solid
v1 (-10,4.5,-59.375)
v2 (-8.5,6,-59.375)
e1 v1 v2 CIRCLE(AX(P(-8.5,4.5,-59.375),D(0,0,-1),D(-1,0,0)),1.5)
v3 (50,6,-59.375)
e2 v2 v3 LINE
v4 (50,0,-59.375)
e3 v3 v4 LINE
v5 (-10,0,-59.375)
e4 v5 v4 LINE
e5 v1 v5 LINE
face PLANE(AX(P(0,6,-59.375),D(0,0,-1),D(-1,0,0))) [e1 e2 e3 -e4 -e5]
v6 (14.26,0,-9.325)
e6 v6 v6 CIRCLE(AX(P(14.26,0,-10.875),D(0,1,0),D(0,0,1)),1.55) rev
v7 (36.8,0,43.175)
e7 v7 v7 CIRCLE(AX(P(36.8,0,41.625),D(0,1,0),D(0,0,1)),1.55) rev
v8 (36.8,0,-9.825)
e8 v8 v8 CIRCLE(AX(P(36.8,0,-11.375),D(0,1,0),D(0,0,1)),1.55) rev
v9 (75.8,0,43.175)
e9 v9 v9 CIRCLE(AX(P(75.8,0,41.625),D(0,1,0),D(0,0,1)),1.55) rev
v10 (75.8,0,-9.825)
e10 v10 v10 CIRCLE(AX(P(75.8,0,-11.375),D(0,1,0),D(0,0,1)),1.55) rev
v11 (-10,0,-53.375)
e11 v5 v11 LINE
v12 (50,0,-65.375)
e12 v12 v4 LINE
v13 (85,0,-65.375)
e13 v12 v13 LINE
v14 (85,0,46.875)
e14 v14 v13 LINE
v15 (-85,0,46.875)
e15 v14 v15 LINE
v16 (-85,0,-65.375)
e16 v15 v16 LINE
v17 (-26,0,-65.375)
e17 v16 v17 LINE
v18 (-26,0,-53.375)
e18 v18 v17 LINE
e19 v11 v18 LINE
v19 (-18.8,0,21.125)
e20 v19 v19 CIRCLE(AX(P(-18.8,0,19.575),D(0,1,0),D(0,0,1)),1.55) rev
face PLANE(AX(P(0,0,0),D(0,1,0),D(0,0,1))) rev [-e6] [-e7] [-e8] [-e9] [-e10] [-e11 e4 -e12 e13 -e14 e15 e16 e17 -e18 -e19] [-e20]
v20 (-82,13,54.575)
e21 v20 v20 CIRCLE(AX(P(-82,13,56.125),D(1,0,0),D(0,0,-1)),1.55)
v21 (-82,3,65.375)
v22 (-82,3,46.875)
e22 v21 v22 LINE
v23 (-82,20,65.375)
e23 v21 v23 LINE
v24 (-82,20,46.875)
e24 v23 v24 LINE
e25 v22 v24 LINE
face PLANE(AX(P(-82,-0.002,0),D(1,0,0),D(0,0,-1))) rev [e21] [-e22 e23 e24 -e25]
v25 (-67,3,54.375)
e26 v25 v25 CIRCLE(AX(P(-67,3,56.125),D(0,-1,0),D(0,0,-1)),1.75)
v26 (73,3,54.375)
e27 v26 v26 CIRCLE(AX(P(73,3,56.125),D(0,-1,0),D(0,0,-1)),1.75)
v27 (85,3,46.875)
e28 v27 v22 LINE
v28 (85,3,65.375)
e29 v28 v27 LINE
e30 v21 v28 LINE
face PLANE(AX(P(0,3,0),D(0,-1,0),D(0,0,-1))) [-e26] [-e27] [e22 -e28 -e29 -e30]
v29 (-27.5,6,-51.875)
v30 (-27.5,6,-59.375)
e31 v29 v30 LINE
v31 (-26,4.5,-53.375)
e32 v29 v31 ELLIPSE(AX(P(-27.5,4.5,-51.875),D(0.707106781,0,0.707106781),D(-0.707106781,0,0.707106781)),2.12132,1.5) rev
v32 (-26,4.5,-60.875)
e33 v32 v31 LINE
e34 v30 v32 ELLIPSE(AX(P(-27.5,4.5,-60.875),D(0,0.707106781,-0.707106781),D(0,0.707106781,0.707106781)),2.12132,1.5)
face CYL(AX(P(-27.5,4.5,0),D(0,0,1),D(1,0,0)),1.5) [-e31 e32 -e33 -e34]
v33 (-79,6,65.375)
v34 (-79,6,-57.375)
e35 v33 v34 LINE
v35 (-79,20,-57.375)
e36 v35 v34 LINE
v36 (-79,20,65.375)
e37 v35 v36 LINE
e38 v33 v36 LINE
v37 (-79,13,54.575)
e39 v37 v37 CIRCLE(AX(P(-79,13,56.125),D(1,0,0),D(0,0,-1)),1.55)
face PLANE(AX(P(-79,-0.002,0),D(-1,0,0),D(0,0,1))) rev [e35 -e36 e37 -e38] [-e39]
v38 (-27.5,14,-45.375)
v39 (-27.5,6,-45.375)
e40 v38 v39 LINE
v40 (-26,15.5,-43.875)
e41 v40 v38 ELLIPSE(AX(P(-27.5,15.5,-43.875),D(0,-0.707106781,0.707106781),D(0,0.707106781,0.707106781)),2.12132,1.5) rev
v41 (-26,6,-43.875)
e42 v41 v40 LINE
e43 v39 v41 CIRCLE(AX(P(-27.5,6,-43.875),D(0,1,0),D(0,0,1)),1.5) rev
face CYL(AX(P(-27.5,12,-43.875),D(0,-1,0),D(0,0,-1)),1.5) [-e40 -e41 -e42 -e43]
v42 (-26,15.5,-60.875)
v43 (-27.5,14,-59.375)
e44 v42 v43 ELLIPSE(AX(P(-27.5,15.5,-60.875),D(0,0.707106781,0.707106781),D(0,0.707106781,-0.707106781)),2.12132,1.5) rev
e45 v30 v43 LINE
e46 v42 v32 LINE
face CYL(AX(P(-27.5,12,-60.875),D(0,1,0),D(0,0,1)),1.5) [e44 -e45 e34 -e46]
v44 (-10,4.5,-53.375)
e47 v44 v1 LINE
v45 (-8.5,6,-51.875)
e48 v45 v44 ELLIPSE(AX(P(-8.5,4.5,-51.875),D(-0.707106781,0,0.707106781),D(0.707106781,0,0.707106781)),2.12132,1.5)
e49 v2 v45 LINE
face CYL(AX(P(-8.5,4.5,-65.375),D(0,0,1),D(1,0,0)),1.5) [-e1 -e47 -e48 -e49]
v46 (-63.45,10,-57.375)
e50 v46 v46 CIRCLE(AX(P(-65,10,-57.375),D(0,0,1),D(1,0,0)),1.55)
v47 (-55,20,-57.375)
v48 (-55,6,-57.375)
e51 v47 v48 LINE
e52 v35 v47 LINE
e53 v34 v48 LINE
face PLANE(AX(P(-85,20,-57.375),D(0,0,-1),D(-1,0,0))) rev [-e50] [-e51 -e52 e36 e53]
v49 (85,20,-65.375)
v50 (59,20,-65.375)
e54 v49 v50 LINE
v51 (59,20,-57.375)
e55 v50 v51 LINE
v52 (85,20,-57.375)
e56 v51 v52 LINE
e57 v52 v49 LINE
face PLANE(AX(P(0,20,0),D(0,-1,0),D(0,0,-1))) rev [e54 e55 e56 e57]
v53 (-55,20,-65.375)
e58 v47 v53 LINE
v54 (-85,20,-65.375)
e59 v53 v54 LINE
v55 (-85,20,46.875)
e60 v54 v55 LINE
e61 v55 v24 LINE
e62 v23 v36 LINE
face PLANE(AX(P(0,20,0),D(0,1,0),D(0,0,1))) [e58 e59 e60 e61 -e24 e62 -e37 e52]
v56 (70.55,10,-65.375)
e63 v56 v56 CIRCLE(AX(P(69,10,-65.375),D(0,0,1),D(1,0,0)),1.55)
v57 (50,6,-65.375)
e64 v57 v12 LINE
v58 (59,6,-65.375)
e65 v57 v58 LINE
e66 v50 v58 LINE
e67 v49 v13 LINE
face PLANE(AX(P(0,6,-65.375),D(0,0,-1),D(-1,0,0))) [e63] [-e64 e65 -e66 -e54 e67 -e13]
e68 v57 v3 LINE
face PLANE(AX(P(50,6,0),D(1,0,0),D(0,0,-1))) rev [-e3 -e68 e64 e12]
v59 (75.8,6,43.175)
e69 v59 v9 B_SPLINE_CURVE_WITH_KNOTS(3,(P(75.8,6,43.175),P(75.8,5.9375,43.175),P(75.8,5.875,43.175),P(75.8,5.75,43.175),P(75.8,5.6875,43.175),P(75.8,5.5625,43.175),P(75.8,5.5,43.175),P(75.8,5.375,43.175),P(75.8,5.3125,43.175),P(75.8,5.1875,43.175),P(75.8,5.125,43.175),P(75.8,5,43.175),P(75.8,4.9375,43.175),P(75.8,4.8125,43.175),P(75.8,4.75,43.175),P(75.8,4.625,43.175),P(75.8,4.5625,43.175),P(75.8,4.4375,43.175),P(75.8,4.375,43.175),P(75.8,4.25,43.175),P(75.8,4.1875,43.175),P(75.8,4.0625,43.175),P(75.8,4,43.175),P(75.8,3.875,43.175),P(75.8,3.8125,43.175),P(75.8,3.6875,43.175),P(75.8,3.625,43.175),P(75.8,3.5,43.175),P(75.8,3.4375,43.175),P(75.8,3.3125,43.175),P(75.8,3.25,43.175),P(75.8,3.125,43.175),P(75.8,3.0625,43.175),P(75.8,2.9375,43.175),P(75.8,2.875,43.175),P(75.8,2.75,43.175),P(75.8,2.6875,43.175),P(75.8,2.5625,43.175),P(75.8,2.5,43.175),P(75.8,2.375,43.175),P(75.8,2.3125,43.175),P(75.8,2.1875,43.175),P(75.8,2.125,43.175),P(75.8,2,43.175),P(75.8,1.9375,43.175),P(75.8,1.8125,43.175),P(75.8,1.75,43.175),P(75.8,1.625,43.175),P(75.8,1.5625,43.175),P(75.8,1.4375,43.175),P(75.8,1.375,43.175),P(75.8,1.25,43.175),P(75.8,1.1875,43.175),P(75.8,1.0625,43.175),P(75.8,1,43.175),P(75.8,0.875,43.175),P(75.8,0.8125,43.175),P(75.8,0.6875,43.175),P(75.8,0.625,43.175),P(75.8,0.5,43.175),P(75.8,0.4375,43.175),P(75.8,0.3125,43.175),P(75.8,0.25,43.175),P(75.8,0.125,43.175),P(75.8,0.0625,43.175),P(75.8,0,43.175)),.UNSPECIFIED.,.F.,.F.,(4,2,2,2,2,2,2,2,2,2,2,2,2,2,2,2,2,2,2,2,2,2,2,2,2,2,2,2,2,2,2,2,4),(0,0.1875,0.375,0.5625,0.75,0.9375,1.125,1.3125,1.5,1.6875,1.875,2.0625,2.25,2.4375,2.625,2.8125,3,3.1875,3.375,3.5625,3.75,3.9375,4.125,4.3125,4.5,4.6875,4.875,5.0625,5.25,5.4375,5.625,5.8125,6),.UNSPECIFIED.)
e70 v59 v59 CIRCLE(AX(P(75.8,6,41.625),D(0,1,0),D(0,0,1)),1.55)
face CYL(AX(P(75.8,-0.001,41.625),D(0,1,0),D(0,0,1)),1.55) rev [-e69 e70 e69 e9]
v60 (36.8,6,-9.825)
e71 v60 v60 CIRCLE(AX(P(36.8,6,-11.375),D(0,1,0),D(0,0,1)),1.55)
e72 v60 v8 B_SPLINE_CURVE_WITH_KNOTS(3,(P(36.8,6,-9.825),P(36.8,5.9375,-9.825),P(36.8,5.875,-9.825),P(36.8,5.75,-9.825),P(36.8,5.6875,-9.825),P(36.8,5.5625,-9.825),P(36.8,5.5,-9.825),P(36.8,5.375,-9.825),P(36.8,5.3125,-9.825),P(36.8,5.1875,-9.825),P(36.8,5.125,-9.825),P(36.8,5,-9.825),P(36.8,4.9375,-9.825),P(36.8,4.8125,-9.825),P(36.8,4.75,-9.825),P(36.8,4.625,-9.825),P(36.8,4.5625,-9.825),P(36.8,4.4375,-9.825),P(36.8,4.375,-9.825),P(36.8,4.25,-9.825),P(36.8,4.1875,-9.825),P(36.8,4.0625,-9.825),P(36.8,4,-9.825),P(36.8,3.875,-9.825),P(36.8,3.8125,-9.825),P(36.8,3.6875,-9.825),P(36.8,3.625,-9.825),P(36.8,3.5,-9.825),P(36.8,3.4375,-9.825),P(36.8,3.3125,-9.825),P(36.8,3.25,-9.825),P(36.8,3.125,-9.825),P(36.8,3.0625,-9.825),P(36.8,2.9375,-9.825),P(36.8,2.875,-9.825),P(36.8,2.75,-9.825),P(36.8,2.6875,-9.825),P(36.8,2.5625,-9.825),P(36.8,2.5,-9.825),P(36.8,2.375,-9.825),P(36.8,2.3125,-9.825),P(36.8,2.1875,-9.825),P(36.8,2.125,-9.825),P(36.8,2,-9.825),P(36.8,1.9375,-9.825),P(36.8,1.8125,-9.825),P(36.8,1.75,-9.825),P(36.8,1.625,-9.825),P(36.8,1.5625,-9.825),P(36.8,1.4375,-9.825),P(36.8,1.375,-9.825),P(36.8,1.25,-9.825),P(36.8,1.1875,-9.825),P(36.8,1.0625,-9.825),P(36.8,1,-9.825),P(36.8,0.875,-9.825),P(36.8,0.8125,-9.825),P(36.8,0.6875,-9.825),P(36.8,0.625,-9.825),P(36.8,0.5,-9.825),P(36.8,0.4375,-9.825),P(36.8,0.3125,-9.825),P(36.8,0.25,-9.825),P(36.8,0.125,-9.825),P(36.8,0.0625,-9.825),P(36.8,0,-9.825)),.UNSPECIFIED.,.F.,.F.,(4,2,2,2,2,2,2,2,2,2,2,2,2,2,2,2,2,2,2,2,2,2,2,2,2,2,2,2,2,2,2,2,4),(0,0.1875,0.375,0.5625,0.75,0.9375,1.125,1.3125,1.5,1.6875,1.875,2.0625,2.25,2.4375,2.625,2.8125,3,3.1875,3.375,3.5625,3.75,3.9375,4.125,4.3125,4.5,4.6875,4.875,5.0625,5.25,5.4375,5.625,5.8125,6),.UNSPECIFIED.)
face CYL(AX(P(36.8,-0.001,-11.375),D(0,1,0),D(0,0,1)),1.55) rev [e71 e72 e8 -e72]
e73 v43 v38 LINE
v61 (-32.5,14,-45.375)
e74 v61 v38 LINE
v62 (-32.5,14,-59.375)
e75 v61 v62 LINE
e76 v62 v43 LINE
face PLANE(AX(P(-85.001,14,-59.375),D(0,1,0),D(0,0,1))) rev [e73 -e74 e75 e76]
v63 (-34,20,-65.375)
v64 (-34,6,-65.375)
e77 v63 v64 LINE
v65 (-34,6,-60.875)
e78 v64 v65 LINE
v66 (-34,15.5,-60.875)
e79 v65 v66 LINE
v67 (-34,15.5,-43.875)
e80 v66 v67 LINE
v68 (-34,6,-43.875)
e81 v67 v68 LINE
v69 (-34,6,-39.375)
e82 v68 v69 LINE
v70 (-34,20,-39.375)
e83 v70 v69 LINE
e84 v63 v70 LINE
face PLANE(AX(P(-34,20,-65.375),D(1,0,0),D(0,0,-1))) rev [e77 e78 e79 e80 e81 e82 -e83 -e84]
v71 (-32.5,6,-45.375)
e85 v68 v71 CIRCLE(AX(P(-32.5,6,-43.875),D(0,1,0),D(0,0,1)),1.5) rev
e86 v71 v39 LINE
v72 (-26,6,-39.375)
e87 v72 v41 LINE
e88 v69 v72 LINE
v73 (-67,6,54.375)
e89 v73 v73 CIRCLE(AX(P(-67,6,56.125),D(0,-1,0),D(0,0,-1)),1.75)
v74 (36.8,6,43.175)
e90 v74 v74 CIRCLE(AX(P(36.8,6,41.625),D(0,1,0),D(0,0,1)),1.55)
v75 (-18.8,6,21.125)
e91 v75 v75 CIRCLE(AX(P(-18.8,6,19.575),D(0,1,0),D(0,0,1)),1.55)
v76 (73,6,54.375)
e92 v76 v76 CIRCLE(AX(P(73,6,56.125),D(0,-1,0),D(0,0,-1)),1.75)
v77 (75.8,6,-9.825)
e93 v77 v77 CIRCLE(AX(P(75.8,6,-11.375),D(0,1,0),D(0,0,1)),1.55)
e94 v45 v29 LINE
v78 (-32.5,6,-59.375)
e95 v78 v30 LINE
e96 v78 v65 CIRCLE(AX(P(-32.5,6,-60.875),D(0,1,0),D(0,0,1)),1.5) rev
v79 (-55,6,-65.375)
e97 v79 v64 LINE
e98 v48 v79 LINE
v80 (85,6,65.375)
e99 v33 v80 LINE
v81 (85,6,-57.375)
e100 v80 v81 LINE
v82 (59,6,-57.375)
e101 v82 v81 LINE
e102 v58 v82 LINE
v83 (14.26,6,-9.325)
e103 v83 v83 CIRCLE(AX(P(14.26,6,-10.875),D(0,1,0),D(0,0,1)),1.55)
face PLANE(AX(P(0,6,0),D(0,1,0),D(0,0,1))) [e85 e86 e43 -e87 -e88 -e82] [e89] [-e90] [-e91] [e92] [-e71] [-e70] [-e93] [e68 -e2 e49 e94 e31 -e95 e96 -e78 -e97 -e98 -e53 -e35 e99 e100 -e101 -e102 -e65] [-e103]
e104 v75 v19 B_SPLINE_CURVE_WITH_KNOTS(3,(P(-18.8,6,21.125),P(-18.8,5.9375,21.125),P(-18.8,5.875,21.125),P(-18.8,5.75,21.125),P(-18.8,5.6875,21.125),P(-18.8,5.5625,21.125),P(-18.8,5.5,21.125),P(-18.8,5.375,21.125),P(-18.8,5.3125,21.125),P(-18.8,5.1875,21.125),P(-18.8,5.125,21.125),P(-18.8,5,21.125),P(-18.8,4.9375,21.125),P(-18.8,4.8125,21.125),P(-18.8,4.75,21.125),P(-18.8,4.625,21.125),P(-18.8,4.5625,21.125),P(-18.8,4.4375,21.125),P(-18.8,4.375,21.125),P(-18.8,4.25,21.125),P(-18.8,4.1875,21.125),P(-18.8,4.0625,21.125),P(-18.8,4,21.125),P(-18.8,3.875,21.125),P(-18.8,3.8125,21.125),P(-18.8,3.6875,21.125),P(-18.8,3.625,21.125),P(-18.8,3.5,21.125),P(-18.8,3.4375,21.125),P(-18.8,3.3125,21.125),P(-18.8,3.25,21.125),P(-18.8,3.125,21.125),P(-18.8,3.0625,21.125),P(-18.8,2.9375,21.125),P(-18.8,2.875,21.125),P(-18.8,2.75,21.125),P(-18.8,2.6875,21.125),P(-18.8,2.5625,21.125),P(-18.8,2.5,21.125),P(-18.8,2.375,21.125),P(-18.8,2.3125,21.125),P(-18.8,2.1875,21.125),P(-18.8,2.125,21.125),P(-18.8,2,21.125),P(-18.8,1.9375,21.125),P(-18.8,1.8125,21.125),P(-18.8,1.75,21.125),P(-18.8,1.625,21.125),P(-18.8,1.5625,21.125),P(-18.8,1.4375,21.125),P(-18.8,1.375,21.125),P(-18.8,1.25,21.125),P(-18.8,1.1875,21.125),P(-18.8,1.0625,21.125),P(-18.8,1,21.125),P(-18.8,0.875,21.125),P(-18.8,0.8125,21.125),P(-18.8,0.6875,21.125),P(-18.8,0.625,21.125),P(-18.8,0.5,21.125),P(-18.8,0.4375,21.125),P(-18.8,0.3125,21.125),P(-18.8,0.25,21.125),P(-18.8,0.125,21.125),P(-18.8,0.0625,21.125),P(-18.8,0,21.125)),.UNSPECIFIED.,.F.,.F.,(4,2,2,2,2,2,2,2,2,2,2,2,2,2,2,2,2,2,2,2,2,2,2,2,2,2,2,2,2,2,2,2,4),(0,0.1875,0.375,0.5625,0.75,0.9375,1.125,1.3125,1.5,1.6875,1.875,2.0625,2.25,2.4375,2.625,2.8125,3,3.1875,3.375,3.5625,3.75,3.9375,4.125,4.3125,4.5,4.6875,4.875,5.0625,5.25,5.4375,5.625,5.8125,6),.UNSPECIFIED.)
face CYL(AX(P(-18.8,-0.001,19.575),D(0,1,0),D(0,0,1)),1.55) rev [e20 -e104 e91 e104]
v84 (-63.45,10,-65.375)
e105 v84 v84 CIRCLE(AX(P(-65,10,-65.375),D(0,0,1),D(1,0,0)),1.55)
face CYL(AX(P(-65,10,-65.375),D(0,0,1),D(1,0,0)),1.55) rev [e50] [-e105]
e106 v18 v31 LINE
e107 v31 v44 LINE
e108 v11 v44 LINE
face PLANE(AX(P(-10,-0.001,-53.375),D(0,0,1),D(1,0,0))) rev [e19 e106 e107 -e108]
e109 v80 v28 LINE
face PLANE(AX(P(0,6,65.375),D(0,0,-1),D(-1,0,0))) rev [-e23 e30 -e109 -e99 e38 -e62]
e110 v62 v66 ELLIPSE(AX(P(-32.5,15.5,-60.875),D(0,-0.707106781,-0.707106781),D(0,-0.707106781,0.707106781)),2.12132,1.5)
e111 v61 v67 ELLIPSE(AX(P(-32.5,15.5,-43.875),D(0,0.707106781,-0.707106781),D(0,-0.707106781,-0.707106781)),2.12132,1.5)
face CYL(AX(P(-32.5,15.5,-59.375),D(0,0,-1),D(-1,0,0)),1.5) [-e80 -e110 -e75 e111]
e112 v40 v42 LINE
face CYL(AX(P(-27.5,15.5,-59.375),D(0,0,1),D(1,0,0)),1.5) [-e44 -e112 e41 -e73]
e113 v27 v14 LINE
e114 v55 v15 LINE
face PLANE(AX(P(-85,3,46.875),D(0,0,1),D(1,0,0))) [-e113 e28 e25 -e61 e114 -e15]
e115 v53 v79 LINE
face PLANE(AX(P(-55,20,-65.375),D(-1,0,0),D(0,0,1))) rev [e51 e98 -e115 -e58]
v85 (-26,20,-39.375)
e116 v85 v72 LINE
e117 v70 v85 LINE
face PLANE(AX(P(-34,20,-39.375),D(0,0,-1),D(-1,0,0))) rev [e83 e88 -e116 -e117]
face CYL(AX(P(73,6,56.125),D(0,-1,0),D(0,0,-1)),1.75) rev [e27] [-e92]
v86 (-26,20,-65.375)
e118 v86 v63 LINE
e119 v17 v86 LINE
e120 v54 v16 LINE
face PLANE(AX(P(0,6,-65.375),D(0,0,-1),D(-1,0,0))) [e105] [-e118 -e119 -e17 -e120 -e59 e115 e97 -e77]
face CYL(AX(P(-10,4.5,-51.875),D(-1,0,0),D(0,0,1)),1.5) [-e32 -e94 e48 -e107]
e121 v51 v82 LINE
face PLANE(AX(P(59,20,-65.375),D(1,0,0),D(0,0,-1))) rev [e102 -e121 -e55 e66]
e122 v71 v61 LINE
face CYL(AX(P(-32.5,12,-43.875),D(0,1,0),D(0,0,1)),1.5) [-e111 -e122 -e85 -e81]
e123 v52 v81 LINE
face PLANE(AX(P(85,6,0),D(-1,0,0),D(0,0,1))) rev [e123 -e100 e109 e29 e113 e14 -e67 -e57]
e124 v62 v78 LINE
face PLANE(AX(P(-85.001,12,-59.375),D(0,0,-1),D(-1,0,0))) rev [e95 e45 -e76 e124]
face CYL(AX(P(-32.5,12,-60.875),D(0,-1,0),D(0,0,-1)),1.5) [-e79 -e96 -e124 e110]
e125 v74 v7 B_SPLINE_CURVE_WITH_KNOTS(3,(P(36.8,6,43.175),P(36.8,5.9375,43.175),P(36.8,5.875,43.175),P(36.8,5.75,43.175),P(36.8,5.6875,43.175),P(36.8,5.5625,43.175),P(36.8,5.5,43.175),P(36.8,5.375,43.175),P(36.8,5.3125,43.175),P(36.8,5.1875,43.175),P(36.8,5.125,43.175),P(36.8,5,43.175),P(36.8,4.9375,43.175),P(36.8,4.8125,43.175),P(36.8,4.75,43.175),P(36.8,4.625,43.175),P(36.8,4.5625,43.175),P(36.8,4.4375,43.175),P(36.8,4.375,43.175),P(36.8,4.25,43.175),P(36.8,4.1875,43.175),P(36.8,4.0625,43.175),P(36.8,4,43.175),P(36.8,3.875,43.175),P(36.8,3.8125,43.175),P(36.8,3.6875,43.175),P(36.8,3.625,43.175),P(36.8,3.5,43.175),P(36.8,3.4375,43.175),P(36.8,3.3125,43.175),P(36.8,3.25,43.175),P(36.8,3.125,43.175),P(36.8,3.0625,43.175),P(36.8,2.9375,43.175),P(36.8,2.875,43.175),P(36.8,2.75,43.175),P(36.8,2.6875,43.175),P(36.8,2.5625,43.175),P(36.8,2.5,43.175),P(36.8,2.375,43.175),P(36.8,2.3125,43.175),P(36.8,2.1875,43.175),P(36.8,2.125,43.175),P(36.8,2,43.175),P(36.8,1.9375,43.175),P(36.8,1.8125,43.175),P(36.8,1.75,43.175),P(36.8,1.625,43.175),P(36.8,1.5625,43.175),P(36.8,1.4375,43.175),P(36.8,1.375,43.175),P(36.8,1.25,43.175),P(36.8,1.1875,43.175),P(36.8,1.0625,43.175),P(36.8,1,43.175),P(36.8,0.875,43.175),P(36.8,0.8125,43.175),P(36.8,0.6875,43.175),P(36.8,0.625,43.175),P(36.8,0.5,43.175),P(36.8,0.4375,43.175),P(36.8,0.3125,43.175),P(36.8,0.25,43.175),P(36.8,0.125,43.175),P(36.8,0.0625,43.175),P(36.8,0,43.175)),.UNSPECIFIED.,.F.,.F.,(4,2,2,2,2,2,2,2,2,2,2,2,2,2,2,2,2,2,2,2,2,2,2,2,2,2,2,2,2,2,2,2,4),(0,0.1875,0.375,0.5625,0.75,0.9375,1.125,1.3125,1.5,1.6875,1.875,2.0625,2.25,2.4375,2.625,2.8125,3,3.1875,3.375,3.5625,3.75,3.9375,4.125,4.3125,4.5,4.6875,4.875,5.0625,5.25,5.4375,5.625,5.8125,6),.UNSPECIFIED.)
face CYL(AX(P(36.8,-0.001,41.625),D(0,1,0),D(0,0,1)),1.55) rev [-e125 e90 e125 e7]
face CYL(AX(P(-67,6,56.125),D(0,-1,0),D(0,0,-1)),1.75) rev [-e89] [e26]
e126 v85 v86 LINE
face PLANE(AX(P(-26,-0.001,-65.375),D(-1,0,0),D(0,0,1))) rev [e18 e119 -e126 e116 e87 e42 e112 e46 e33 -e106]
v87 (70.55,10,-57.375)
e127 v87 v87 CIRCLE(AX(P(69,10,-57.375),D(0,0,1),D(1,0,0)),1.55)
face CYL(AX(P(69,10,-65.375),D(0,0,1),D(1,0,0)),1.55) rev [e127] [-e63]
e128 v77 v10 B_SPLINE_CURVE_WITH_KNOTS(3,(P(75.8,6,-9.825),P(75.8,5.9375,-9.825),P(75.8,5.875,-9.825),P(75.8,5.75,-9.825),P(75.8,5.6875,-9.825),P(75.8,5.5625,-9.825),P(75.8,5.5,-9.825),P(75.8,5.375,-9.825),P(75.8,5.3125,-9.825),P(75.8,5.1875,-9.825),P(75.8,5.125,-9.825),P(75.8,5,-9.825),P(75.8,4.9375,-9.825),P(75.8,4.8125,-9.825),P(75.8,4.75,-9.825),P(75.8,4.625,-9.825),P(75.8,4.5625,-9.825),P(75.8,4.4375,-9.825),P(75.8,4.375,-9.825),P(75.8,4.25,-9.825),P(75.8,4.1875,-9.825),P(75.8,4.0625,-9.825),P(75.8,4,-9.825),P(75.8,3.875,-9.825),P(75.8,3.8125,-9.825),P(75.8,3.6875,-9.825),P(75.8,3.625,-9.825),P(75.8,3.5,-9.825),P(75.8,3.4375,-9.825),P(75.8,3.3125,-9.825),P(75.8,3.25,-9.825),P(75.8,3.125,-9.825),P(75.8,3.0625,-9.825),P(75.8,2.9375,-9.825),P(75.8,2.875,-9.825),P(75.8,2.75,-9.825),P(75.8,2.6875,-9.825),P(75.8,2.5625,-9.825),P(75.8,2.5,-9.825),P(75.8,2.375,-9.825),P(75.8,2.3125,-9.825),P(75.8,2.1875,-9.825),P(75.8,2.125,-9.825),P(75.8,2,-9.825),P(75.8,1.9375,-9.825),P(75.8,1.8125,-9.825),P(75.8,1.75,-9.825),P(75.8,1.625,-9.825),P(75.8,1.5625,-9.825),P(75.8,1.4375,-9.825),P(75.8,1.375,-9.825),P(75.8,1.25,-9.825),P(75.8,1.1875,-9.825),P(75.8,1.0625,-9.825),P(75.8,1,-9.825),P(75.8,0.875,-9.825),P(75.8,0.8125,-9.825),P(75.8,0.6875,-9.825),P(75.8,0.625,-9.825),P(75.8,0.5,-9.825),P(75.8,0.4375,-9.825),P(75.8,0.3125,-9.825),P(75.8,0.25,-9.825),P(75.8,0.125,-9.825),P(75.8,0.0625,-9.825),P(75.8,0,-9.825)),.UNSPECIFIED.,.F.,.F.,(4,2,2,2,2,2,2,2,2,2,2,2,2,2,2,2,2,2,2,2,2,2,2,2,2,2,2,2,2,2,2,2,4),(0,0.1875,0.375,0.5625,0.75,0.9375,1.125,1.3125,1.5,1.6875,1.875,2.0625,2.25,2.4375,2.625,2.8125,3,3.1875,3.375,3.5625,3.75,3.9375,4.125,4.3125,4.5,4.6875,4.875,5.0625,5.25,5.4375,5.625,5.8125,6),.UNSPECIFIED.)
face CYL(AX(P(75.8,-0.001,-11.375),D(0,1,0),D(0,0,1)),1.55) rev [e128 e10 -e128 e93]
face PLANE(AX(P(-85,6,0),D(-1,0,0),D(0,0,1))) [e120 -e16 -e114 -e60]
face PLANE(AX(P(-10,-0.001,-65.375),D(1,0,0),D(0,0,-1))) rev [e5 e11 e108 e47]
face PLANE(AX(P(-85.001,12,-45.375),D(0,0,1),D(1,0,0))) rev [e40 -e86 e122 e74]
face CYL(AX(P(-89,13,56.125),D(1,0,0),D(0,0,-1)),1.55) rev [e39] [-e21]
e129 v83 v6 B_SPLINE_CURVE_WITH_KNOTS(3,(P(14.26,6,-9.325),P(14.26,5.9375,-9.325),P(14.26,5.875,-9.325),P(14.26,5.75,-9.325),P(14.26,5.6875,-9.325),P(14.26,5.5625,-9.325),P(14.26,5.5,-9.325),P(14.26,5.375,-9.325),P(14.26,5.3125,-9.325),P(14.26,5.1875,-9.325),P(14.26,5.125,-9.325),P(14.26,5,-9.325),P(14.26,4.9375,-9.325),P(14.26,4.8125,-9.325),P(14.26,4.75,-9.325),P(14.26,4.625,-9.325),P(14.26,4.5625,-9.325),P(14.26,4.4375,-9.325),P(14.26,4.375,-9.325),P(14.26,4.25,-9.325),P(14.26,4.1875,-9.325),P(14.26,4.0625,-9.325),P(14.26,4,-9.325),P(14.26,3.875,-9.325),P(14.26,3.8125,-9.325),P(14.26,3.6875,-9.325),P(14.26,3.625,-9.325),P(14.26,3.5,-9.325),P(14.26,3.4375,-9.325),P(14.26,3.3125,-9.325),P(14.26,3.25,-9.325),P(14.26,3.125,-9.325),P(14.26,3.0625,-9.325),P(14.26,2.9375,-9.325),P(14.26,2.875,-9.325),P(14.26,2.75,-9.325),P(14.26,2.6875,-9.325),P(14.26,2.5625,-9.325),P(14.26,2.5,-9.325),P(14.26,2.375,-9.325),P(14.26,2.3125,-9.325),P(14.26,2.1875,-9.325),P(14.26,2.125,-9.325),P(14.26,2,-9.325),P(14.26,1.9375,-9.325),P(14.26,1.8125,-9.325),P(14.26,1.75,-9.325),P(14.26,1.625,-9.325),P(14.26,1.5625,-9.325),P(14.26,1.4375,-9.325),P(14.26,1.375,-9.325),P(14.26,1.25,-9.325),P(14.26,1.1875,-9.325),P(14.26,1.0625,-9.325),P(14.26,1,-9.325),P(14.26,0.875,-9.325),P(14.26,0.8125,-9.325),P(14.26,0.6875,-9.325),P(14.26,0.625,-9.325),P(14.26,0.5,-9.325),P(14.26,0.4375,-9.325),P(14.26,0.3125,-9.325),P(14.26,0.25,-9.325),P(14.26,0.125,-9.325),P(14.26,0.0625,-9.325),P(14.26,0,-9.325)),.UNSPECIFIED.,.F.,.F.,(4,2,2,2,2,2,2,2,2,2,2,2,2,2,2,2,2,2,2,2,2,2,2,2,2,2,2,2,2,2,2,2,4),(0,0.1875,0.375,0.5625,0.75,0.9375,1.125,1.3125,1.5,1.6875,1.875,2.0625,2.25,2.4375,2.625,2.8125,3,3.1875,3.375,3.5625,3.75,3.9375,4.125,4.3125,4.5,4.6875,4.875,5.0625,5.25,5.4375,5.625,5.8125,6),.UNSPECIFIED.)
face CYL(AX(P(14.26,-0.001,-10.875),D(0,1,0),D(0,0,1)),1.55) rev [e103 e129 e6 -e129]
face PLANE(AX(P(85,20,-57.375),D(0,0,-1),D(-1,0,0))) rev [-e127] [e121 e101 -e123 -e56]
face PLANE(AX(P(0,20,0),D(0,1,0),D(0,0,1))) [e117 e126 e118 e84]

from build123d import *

# Parameters (mm, degrees)
BOSS_EXTRUDE1_DEPTH = 6
SKETCH2_W           = 30
SKETCH2_H           = 8
SKETCH2_W_2         = 26
BOSS_EXTRUDE2_DEPTH = 14
SKETCH3_R           = 1.55
CUT_EXTRUDE1_DEPTH  = 151.6405075
SKETCH4_W           = 170
SKETCH4_H           = 18.5
CUT_EXTRUDE2_DEPTH  = 3
SKETCH5_R           = 1.75
CUT_EXTRUDE3_DEPTH  = 3
BOSS_EXTRUDE3_REACH = 111.082
CUT_EXTRUDE4_REACH  = 110.143
SKETCH8_W           = 3
SKETCH8_H           = 18.5
SKETCH9_R           = 1.55
CUT_EXTRUDE5_DEPTH  = 10
CUT_EXTRUDE6_REACH  = 110.143
SKETCH10_W          = 16
SKETCH10_H          = 12
SKETCH11_W          = 8
SKETCH11_H          = 26
BOSS_EXTRUDE4_DEPTH = 14
CUT_EXTRUDE7_REACH  = 132.364
FILLET1_R           = 1.5
CUT_EXTRUDE8_REACH  = 110.143
SKETCH15_R          = 1.55


with BuildPart() as part:
    # Sketch1 → Boss-Extrude1 (new body)
    with BuildSketch(Plane(origin=(0, 0, 0), x_dir=(1, 0, 0), z_dir=(0, 1, 0))):
        Polygon((-85, 65.375), (-85, -65.375), (85, -65.375), (85, 65.375), (50, 65.375), (50, 59.375), (-10, 59.375), (-10, 65.375), align=None)
    extrude(amount=BOSS_EXTRUDE1_DEPTH)

    # Sketch2 → Boss-Extrude2 (add)
    with BuildSketch(Plane(origin=(0, 6, 0), x_dir=(1, 0, 0), z_dir=(0, 1, 0))):
        with Locations((-70, 61.375)):
            Rectangle(SKETCH2_W, SKETCH2_H)
        with Locations((72, 61.375)):
            Rectangle(SKETCH2_W_2, SKETCH2_H)
    extrude(amount=BOSS_EXTRUDE2_DEPTH)

    # Sketch3 → Cut-Extrude1 (cut, through all)
    with BuildSketch(Plane.XY.offset(-57.375)):
        with Locations((-65, 10)):
            Circle(SKETCH3_R)
        with Locations((69, 10)):
            Circle(SKETCH3_R)
    extrude(amount=-CUT_EXTRUDE1_DEPTH, mode=Mode.SUBTRACT)

    # Sketch4 → Cut-Extrude2 (cut)
    with BuildSketch(Plane(origin=(0, 0, 0), x_dir=(1, 0, 0), z_dir=(0, 1, 0))):
        with Locations((0, -56.125)):
            Rectangle(SKETCH4_W, SKETCH4_H)
    extrude(amount=CUT_EXTRUDE2_DEPTH, mode=Mode.SUBTRACT)

    # Sketch5 → Cut-Extrude3 (cut)
    with BuildSketch(Plane(origin=(0, 3, 0), x_dir=(-1, 0, 0), z_dir=(0, -1, 0))):
        with Locations(Location((67, -56.125, 0), (0, 0, 90))):
            Circle(SKETCH5_R)
        with Locations(Location((-73, -56.125, 0), (0, 0, 90))):
            Circle(SKETCH5_R)
    extrude(amount=-CUT_EXTRUDE3_DEPTH, mode=Mode.SUBTRACT)

    # Sketch7 → Boss-Extrude3 (add, up to next)
    with BuildSketch(Plane(origin=(0, 20, 0), x_dir=(1, 0, 0), z_dir=(0, 1, 0)), mode=Mode.PRIVATE) as boss_extrude3_sk1:
        Polygon((-79, 65.375), (-85, 65.375), (-85, -46.875), (-82, -46.875), (-82, -65.375), (-79, -65.375), align=None)
    boss_extrude3_tool1 = extrude(boss_extrude3_sk1.sketch, amount=-BOSS_EXTRUDE3_REACH, mode=Mode.PRIVATE) - part.part
    add(boss_extrude3_tool1.solids().sort_by_distance((-81.885802, 20, -4.272891))[0])

    # Sketch8 → Cut-Extrude4 (cut, up to next)
    with BuildSketch(Plane(origin=(0, 6, 0), x_dir=(1, 0, 0), z_dir=(0, 1, 0)), mode=Mode.PRIVATE) as cut_extrude4_sk1:
        with Locations((-83.5, -56.125)):
            Rectangle(SKETCH8_W, SKETCH8_H)
    cut_extrude4_tool1 = extrude(cut_extrude4_sk1.sketch, amount=-CUT_EXTRUDE4_REACH, mode=Mode.PRIVATE) & part.part
    add(cut_extrude4_tool1.solids().sort_by_distance((-83.5, 6, 56.125))[0], mode=Mode.SUBTRACT)

    # Sketch9 → Cut-Extrude5 (cut)
    with BuildSketch(Plane(origin=(-79, 0, 0), x_dir=(0, 0, -1), z_dir=(1, 0, 0))):
        with Locations((-56.125, 13)):
            Circle(SKETCH9_R)
    extrude(amount=-CUT_EXTRUDE5_DEPTH, mode=Mode.SUBTRACT)

    # Sketch10 → Cut-Extrude6 (cut, up to next)
    with BuildSketch(Plane(origin=(0, 6, 0), x_dir=(1, 0, 0), z_dir=(0, 1, 0)), mode=Mode.PRIVATE) as cut_extrude6_sk1:
        with Locations((-18, 59.375)):
            Rectangle(SKETCH10_W, SKETCH10_H)
    cut_extrude6_tool1 = extrude(cut_extrude6_sk1.sketch, amount=-CUT_EXTRUDE6_REACH, mode=Mode.PRIVATE) & part.part
    add(cut_extrude6_tool1.solids().sort_by_distance((-18, 6, -59.375))[0], mode=Mode.SUBTRACT)

    # Sketch11 → Boss-Extrude4 (add)
    with BuildSketch(Plane(origin=(0, 6, 0), x_dir=(1, 0, 0), z_dir=(0, 1, 0))):
        with Locations((-30, 52.375)):
            Rectangle(SKETCH11_W, SKETCH11_H)
    extrude(amount=BOSS_EXTRUDE4_DEPTH)

    # Sketch13 → Cut-Extrude7 (cut, up to next)
    with BuildSketch(Plane(origin=(-26, 0, 0), x_dir=(0, 0, -1), z_dir=(1, 0, 0)), mode=Mode.PRIVATE) as cut_extrude7_sk1:
        Polygon((45.375, 12), (45.375, 6), (59.375, 6), (59.375, 12), (59.375, 14), (45.375, 14), align=None)
    cut_extrude7_tool1 = extrude(cut_extrude7_sk1.sketch, amount=-CUT_EXTRUDE7_REACH, mode=Mode.PRIVATE) & part.part
    add(cut_extrude7_tool1.solids().sort_by_distance((-26, 10, -52.375))[0], mode=Mode.SUBTRACT)

    # Fillet1
    # the kernel refuses this fillet: 1.5 mm, written as the material it takes off along each edge
    with BuildSketch(Plane(origin=(-34, 6, -59.375), x_dir=(0, 0, -1), z_dir=(0, 1, 0)), Plane(origin=(-26, 14, -59.375), x_dir=(0, 0, -1), z_dir=(0, -1, 0)), Plane(origin=(-34, 14, -45.375), x_dir=(0, 0, 1), z_dir=(0, -1, 0)), Plane(origin=(-26, 6, -45.375), x_dir=(0, 0, 1), z_dir=(0, 1, 0))) as fillet1_piece_1:
        with BuildLine():
            CenterArc((FILLET1_R, -FILLET1_R), FILLET1_R, 90, 90)
            Line((0, -FILLET1_R), (0, 0))
            Line((0, 0), (FILLET1_R, 0))
        make_face()
    extrude(amount=8, mode=Mode.SUBTRACT)
    with BuildSketch(Plane(origin=(-34, 14, -59.375), x_dir=(0, 1, 0), z_dir=(0, 0, 1))) as fillet1_piece_2:
        with BuildLine():
            CenterArc((FILLET1_R, -FILLET1_R), FILLET1_R, 90, 90)
            Line((0, -FILLET1_R), (0, 0))
            Line((0, 0), (FILLET1_R, 0))
        make_face()
    extrude(amount=14, mode=Mode.SUBTRACT)
    with BuildSketch(Plane(origin=(-26, 14, -59.375), x_dir=(0, 1, 0), z_dir=(0, 0, 1))) as fillet1_piece_3:
        with BuildLine():
            CenterArc((FILLET1_R, FILLET1_R), FILLET1_R, 180, 90)
            Line((0, FILLET1_R), (0, 0))
            Line((0, 0), (FILLET1_R, 0))
        make_face()
    extrude(amount=14, mode=Mode.SUBTRACT)
    with BuildSketch(Plane(origin=(-10, 6, -53.375), x_dir=(1, 0, 0), z_dir=(0, 0, -1))) as fillet1_piece_4:
        with BuildLine():
            CenterArc((FILLET1_R, FILLET1_R), FILLET1_R, 180, 90)
            Line((0, FILLET1_R), (0, 0))
            Line((0, 0), (FILLET1_R, 0))
        make_face()
    extrude(amount=9.75, mode=Mode.SUBTRACT)
    with BuildSketch(Plane(origin=(-26, 6, -59.375), x_dir=(0, -1, 0), z_dir=(0, 0, 1))) as fillet1_piece_5:
        with BuildLine():
            CenterArc((FILLET1_R, -FILLET1_R), FILLET1_R, 90, 90)
            Line((0, -FILLET1_R), (0, 0))
            Line((0, 0), (FILLET1_R, 0))
        make_face()
    extrude(amount=6, mode=Mode.SUBTRACT)
    with BuildSketch(Plane(origin=(-26, 6, -53.375), x_dir=(0, 0, 1), z_dir=(1, 0, 0))) as fillet1_piece_6:
        with BuildLine():
            CenterArc((FILLET1_R, FILLET1_R), FILLET1_R, 180, 90)
            Line((0, FILLET1_R), (0, 0))
            Line((0, 0), (FILLET1_R, 0))
        make_face()
    extrude(amount=16, mode=Mode.SUBTRACT)
    with BuildSketch(Plane(origin=(-34, 14, -63.125), x_dir=(0, 1, 0), z_dir=(0, 0, 1))) as fillet1_piece_7a_section:
        with BuildLine():
            CenterArc((FILLET1_R, -FILLET1_R), FILLET1_R, 90, 90)
            Line((0, -FILLET1_R), (0, 0))
            Line((0, 0), (FILLET1_R, 0))
        make_face()
    fillet1_piece_7a = extrude(amount=17.75, mode=Mode.PRIVATE)
    fillet1_piece_7a = split(fillet1_piece_7a, bisect_by=Plane(origin=(-33.660407329, 14.339592671, -59.375), z_dir=(0, 0, -1)), keep=Keep.TOP, mode=Mode.PRIVATE)
    with BuildSketch(Plane(origin=(-34, 6, -59.375), x_dir=(0, 0, -1), z_dir=(0, 1, 0))) as fillet1_piece_7b_section:
        with BuildLine():
            CenterArc((FILLET1_R, -FILLET1_R), FILLET1_R, 90, 90)
            Line((0, -FILLET1_R), (0, 0))
            Line((0, 0), (FILLET1_R, 0))
        make_face()
    fillet1_piece_7b = extrude(amount=11.75, mode=Mode.PRIVATE)
    fillet1_piece_7b = split(fillet1_piece_7b, bisect_by=Plane(origin=(-33.660407329, 14, -59.714592671), z_dir=(0, 1, 0)), keep=Keep.TOP, mode=Mode.PRIVATE)
    fillet1_piece_7 = fillet1_piece_7a & fillet1_piece_7b
    add(fillet1_piece_7, mode=Mode.SUBTRACT)
    with BuildSketch(Plane(origin=(-26, 14, -63.125), x_dir=(0, 1, 0), z_dir=(0, 0, 1))) as fillet1_piece_8a_section:
        with BuildLine():
            CenterArc((FILLET1_R, FILLET1_R), FILLET1_R, 180, 90)
            Line((0, FILLET1_R), (0, 0))
            Line((0, 0), (FILLET1_R, 0))
        make_face()
    fillet1_piece_8a = extrude(amount=17.75, mode=Mode.PRIVATE)
    fillet1_piece_8a = split(fillet1_piece_8a, bisect_by=Plane(origin=(-26.339592671, 14.339592671, -59.375), z_dir=(0, 0, -1)), keep=Keep.TOP, mode=Mode.PRIVATE)
    with BuildSketch(Plane(origin=(-26, 17.75, -59.375), x_dir=(0, 0, -1), z_dir=(0, -1, 0))) as fillet1_piece_8b_section:
        with BuildLine():
            CenterArc((FILLET1_R, -FILLET1_R), FILLET1_R, 90, 90)
            Line((0, -FILLET1_R), (0, 0))
            Line((0, 0), (FILLET1_R, 0))
        make_face()
    fillet1_piece_8b = extrude(amount=11.75, mode=Mode.PRIVATE)
    fillet1_piece_8b = split(fillet1_piece_8b, bisect_by=Plane(origin=(-26.339592671, 14, -59.714592671), z_dir=(0, 1, 0)), keep=Keep.TOP, mode=Mode.PRIVATE)
    fillet1_piece_8 = fillet1_piece_8a & fillet1_piece_8b
    add(fillet1_piece_8, mode=Mode.SUBTRACT)
    with BuildSketch(Plane(origin=(-26, 14, -59.375), x_dir=(0, 0, -1), z_dir=(0, -1, 0))) as fillet1_piece_9a_section:
        with BuildLine():
            CenterArc((FILLET1_R, -FILLET1_R), FILLET1_R, 90, 90)
            Line((0, -FILLET1_R), (0, 0))
            Line((0, 0), (FILLET1_R, 0))
        make_face()
    fillet1_piece_9a = extrude(amount=11.75, mode=Mode.PRIVATE)
    fillet1_piece_9a = split(fillet1_piece_9a, bisect_by=Plane(origin=(-26.339592671, 6, -59.714592671), z_dir=(0, -1, 0)), keep=Keep.TOP, mode=Mode.PRIVATE)
    with BuildSketch(Plane(origin=(-26, 6, -63.125), x_dir=(0, -1, 0), z_dir=(0, 0, 1))) as fillet1_piece_9b_section:
        with BuildLine():
            CenterArc((FILLET1_R, -FILLET1_R), FILLET1_R, 90, 90)
            Line((0, -FILLET1_R), (0, 0))
            Line((0, 0), (FILLET1_R, 0))
        make_face()
    fillet1_piece_9b = extrude(amount=9.75, mode=Mode.PRIVATE)
    fillet1_piece_9b = split(fillet1_piece_9b, bisect_by=Plane(origin=(-26.339592671, 5.660407329, -59.375), z_dir=(0, 0, -1)), keep=Keep.TOP, mode=Mode.PRIVATE)
    fillet1_piece_9 = fillet1_piece_9a & fillet1_piece_9b
    add(fillet1_piece_9, mode=Mode.SUBTRACT)
    with BuildSketch(Plane(origin=(-34, 17.75, -45.375), x_dir=(0, 0, 1), z_dir=(0, -1, 0))) as fillet1_piece_10a_section:
        with BuildLine():
            CenterArc((FILLET1_R, -FILLET1_R), FILLET1_R, 90, 90)
            Line((0, -FILLET1_R), (0, 0))
            Line((0, 0), (FILLET1_R, 0))
        make_face()
    fillet1_piece_10a = extrude(amount=11.75, mode=Mode.PRIVATE)
    fillet1_piece_10a = split(fillet1_piece_10a, bisect_by=Plane(origin=(-33.660407329, 14, -45.035407329), z_dir=(0, 1, 0)), keep=Keep.TOP, mode=Mode.PRIVATE)
    with BuildSketch(Plane(origin=(-34, 14, -59.375), x_dir=(0, 1, 0), z_dir=(0, 0, 1))) as fillet1_piece_10b_section:
        with BuildLine():
            CenterArc((FILLET1_R, -FILLET1_R), FILLET1_R, 90, 90)
            Line((0, -FILLET1_R), (0, 0))
            Line((0, 0), (FILLET1_R, 0))
        make_face()
    fillet1_piece_10b = extrude(amount=17.75, mode=Mode.PRIVATE)
    fillet1_piece_10b = split(fillet1_piece_10b, bisect_by=Plane(origin=(-33.660407329, 14.339592671, -45.375), z_dir=(0, 0, 1)), keep=Keep.TOP, mode=Mode.PRIVATE)
    fillet1_piece_10 = fillet1_piece_10a & fillet1_piece_10b
    add(fillet1_piece_10, mode=Mode.SUBTRACT)
    with BuildSketch(Plane(origin=(-26, 6, -45.375), x_dir=(0, 0, 1), z_dir=(0, 1, 0))) as fillet1_piece_11a_section:
        with BuildLine():
            CenterArc((FILLET1_R, -FILLET1_R), FILLET1_R, 90, 90)
            Line((0, -FILLET1_R), (0, 0))
            Line((0, 0), (FILLET1_R, 0))
        make_face()
    fillet1_piece_11a = extrude(amount=11.75, mode=Mode.PRIVATE)
    fillet1_piece_11a = split(fillet1_piece_11a, bisect_by=Plane(origin=(-26.339592671, 14, -45.035407329), z_dir=(0, 1, 0)), keep=Keep.TOP, mode=Mode.PRIVATE)
    with BuildSketch(Plane(origin=(-26, 14, -59.375), x_dir=(0, 1, 0), z_dir=(0, 0, 1))) as fillet1_piece_11b_section:
        with BuildLine():
            CenterArc((FILLET1_R, FILLET1_R), FILLET1_R, 180, 90)
            Line((0, FILLET1_R), (0, 0))
            Line((0, 0), (FILLET1_R, 0))
        make_face()
    fillet1_piece_11b = extrude(amount=17.75, mode=Mode.PRIVATE)
    fillet1_piece_11b = split(fillet1_piece_11b, bisect_by=Plane(origin=(-26.339592671, 14.339592671, -45.375), z_dir=(0, 0, 1)), keep=Keep.TOP, mode=Mode.PRIVATE)
    fillet1_piece_11 = fillet1_piece_11a & fillet1_piece_11b
    add(fillet1_piece_11, mode=Mode.SUBTRACT)
    with BuildSketch(Plane(origin=(-10, 6, -49.625), x_dir=(1, 0, 0), z_dir=(0, 0, -1))) as fillet1_piece_12a_section:
        with BuildLine():
            CenterArc((FILLET1_R, FILLET1_R), FILLET1_R, 180, 90)
            Line((0, FILLET1_R), (0, 0))
            Line((0, 0), (FILLET1_R, 0))
        make_face()
    fillet1_piece_12a = extrude(amount=13.5, mode=Mode.PRIVATE)
    fillet1_piece_12a = split(fillet1_piece_12a, bisect_by=Plane(origin=(-9.660407329, 5.660407329, -53.375), z_dir=(0, 0, 1)), keep=Keep.TOP, mode=Mode.PRIVATE)
    with BuildSketch(Plane(origin=(-26, 6, -53.375), x_dir=(0, 0, 1), z_dir=(1, 0, 0))) as fillet1_piece_12b_section:
        with BuildLine():
            CenterArc((FILLET1_R, FILLET1_R), FILLET1_R, 180, 90)
            Line((0, FILLET1_R), (0, 0))
            Line((0, 0), (FILLET1_R, 0))
        make_face()
    fillet1_piece_12b = extrude(amount=19.75, mode=Mode.PRIVATE)
    fillet1_piece_12b = split(fillet1_piece_12b, bisect_by=Plane(origin=(-10, 5.660407329, -53.035407329), z_dir=(1, 0, 0)), keep=Keep.TOP, mode=Mode.PRIVATE)
    fillet1_piece_12 = fillet1_piece_12a & fillet1_piece_12b
    add(fillet1_piece_12, mode=Mode.SUBTRACT)
    with BuildSketch(Plane(origin=(-26, 6, -59.375), x_dir=(0, -1, 0), z_dir=(0, 0, 1))) as fillet1_piece_13a_section:
        with BuildLine():
            CenterArc((FILLET1_R, -FILLET1_R), FILLET1_R, 90, 90)
            Line((0, -FILLET1_R), (0, 0))
            Line((0, 0), (FILLET1_R, 0))
        make_face()
    fillet1_piece_13a = extrude(amount=9.75, mode=Mode.PRIVATE)
    fillet1_piece_13a = split(fillet1_piece_13a, bisect_by=Plane(origin=(-26.339592671, 5.660407329, -53.375), z_dir=(0, 0, 1)), keep=Keep.TOP, mode=Mode.PRIVATE)
    with BuildSketch(Plane(origin=(-29.75, 6, -53.375), x_dir=(0, 0, 1), z_dir=(1, 0, 0))) as fillet1_piece_13b_section:
        with BuildLine():
            CenterArc((FILLET1_R, FILLET1_R), FILLET1_R, 180, 90)
            Line((0, FILLET1_R), (0, 0))
            Line((0, 0), (FILLET1_R, 0))
        make_face()
    fillet1_piece_13b = extrude(amount=19.75, mode=Mode.PRIVATE)
    fillet1_piece_13b = split(fillet1_piece_13b, bisect_by=Plane(origin=(-26, 5.660407329, -53.035407329), z_dir=(-1, 0, 0)), keep=Keep.TOP, mode=Mode.PRIVATE)
    fillet1_piece_13 = fillet1_piece_13a & fillet1_piece_13b
    add(fillet1_piece_13, mode=Mode.SUBTRACT)

    # Sketch15 → Cut-Extrude8 (cut, up to next)
    with BuildSketch(Plane(origin=(0, 6, 0), x_dir=(1, 0, 0), z_dir=(0, 1, 0)), mode=Mode.PRIVATE) as cut_extrude8_sk1:
        with Locations(Location((-18.8, -19.575, 0), (0, 0, 270))):
            Circle(SKETCH15_R)
    cut_extrude8_tool1 = extrude(cut_extrude8_sk1.sketch, amount=-CUT_EXTRUDE8_REACH, mode=Mode.PRIVATE) & part.part
    # Sketch15 → Cut-Extrude8 (cut, up to next)
    with BuildSketch(Plane(origin=(0, 6, 0), x_dir=(1, 0, 0), z_dir=(0, 1, 0)), mode=Mode.PRIVATE) as cut_extrude8_sk2:
        with Locations(Location((14.26, 10.875, 0), (0, 0, 270))):
            Circle(SKETCH15_R)
    cut_extrude8_tool2 = extrude(cut_extrude8_sk2.sketch, amount=-CUT_EXTRUDE8_REACH, mode=Mode.PRIVATE) & part.part
    # Sketch15 → Cut-Extrude8 (cut, up to next)
    with BuildSketch(Plane(origin=(0, 6, 0), x_dir=(1, 0, 0), z_dir=(0, 1, 0)), mode=Mode.PRIVATE) as cut_extrude8_sk3:
        with Locations(Location((36.8, 11.375, 0), (0, 0, 270))):
            Circle(SKETCH15_R)
    cut_extrude8_tool3 = extrude(cut_extrude8_sk3.sketch, amount=-CUT_EXTRUDE8_REACH, mode=Mode.PRIVATE) & part.part
    # Sketch15 → Cut-Extrude8 (cut, up to next)
    with BuildSketch(Plane(origin=(0, 6, 0), x_dir=(1, 0, 0), z_dir=(0, 1, 0)), mode=Mode.PRIVATE) as cut_extrude8_sk4:
        with Locations(Location((75.8, 11.375, 0), (0, 0, 270))):
            Circle(SKETCH15_R)
    cut_extrude8_tool4 = extrude(cut_extrude8_sk4.sketch, amount=-CUT_EXTRUDE8_REACH, mode=Mode.PRIVATE) & part.part
    # Sketch15 → Cut-Extrude8 (cut, up to next)
    with BuildSketch(Plane(origin=(0, 6, 0), x_dir=(1, 0, 0), z_dir=(0, 1, 0)), mode=Mode.PRIVATE) as cut_extrude8_sk5:
        with Locations(Location((75.8, -41.625, 0), (0, 0, 270))):
            Circle(SKETCH15_R)
    cut_extrude8_tool5 = extrude(cut_extrude8_sk5.sketch, amount=-CUT_EXTRUDE8_REACH, mode=Mode.PRIVATE) & part.part
    # Sketch15 → Cut-Extrude8 (cut, up to next)
    with BuildSketch(Plane(origin=(0, 6, 0), x_dir=(1, 0, 0), z_dir=(0, 1, 0)), mode=Mode.PRIVATE) as cut_extrude8_sk6:
        with Locations(Location((36.8, -41.625, 0), (0, 0, 270))):
            Circle(SKETCH15_R)
    cut_extrude8_tool6 = extrude(cut_extrude8_sk6.sketch, amount=-CUT_EXTRUDE8_REACH, mode=Mode.PRIVATE) & part.part
    add(cut_extrude8_tool1.solids().sort_by_distance((-18.8, 6, 19.575))[0], mode=Mode.SUBTRACT)
    add(cut_extrude8_tool2.solids().sort_by_distance((14.26, 6, -10.875))[0], mode=Mode.SUBTRACT)
    add(cut_extrude8_tool3.solids().sort_by_distance((36.8, 6, -11.375))[0], mode=Mode.SUBTRACT)
    add(cut_extrude8_tool4.solids().sort_by_distance((75.8, 6, -11.375))[0], mode=Mode.SUBTRACT)
    add(cut_extrude8_tool5.solids().sort_by_distance((75.8, 6, 41.625))[0], mode=Mode.SUBTRACT)
    add(cut_extrude8_tool6.solids().sort_by_distance((36.8, 6, 41.625))[0], mode=Mode.SUBTRACT)


solid = part.part
